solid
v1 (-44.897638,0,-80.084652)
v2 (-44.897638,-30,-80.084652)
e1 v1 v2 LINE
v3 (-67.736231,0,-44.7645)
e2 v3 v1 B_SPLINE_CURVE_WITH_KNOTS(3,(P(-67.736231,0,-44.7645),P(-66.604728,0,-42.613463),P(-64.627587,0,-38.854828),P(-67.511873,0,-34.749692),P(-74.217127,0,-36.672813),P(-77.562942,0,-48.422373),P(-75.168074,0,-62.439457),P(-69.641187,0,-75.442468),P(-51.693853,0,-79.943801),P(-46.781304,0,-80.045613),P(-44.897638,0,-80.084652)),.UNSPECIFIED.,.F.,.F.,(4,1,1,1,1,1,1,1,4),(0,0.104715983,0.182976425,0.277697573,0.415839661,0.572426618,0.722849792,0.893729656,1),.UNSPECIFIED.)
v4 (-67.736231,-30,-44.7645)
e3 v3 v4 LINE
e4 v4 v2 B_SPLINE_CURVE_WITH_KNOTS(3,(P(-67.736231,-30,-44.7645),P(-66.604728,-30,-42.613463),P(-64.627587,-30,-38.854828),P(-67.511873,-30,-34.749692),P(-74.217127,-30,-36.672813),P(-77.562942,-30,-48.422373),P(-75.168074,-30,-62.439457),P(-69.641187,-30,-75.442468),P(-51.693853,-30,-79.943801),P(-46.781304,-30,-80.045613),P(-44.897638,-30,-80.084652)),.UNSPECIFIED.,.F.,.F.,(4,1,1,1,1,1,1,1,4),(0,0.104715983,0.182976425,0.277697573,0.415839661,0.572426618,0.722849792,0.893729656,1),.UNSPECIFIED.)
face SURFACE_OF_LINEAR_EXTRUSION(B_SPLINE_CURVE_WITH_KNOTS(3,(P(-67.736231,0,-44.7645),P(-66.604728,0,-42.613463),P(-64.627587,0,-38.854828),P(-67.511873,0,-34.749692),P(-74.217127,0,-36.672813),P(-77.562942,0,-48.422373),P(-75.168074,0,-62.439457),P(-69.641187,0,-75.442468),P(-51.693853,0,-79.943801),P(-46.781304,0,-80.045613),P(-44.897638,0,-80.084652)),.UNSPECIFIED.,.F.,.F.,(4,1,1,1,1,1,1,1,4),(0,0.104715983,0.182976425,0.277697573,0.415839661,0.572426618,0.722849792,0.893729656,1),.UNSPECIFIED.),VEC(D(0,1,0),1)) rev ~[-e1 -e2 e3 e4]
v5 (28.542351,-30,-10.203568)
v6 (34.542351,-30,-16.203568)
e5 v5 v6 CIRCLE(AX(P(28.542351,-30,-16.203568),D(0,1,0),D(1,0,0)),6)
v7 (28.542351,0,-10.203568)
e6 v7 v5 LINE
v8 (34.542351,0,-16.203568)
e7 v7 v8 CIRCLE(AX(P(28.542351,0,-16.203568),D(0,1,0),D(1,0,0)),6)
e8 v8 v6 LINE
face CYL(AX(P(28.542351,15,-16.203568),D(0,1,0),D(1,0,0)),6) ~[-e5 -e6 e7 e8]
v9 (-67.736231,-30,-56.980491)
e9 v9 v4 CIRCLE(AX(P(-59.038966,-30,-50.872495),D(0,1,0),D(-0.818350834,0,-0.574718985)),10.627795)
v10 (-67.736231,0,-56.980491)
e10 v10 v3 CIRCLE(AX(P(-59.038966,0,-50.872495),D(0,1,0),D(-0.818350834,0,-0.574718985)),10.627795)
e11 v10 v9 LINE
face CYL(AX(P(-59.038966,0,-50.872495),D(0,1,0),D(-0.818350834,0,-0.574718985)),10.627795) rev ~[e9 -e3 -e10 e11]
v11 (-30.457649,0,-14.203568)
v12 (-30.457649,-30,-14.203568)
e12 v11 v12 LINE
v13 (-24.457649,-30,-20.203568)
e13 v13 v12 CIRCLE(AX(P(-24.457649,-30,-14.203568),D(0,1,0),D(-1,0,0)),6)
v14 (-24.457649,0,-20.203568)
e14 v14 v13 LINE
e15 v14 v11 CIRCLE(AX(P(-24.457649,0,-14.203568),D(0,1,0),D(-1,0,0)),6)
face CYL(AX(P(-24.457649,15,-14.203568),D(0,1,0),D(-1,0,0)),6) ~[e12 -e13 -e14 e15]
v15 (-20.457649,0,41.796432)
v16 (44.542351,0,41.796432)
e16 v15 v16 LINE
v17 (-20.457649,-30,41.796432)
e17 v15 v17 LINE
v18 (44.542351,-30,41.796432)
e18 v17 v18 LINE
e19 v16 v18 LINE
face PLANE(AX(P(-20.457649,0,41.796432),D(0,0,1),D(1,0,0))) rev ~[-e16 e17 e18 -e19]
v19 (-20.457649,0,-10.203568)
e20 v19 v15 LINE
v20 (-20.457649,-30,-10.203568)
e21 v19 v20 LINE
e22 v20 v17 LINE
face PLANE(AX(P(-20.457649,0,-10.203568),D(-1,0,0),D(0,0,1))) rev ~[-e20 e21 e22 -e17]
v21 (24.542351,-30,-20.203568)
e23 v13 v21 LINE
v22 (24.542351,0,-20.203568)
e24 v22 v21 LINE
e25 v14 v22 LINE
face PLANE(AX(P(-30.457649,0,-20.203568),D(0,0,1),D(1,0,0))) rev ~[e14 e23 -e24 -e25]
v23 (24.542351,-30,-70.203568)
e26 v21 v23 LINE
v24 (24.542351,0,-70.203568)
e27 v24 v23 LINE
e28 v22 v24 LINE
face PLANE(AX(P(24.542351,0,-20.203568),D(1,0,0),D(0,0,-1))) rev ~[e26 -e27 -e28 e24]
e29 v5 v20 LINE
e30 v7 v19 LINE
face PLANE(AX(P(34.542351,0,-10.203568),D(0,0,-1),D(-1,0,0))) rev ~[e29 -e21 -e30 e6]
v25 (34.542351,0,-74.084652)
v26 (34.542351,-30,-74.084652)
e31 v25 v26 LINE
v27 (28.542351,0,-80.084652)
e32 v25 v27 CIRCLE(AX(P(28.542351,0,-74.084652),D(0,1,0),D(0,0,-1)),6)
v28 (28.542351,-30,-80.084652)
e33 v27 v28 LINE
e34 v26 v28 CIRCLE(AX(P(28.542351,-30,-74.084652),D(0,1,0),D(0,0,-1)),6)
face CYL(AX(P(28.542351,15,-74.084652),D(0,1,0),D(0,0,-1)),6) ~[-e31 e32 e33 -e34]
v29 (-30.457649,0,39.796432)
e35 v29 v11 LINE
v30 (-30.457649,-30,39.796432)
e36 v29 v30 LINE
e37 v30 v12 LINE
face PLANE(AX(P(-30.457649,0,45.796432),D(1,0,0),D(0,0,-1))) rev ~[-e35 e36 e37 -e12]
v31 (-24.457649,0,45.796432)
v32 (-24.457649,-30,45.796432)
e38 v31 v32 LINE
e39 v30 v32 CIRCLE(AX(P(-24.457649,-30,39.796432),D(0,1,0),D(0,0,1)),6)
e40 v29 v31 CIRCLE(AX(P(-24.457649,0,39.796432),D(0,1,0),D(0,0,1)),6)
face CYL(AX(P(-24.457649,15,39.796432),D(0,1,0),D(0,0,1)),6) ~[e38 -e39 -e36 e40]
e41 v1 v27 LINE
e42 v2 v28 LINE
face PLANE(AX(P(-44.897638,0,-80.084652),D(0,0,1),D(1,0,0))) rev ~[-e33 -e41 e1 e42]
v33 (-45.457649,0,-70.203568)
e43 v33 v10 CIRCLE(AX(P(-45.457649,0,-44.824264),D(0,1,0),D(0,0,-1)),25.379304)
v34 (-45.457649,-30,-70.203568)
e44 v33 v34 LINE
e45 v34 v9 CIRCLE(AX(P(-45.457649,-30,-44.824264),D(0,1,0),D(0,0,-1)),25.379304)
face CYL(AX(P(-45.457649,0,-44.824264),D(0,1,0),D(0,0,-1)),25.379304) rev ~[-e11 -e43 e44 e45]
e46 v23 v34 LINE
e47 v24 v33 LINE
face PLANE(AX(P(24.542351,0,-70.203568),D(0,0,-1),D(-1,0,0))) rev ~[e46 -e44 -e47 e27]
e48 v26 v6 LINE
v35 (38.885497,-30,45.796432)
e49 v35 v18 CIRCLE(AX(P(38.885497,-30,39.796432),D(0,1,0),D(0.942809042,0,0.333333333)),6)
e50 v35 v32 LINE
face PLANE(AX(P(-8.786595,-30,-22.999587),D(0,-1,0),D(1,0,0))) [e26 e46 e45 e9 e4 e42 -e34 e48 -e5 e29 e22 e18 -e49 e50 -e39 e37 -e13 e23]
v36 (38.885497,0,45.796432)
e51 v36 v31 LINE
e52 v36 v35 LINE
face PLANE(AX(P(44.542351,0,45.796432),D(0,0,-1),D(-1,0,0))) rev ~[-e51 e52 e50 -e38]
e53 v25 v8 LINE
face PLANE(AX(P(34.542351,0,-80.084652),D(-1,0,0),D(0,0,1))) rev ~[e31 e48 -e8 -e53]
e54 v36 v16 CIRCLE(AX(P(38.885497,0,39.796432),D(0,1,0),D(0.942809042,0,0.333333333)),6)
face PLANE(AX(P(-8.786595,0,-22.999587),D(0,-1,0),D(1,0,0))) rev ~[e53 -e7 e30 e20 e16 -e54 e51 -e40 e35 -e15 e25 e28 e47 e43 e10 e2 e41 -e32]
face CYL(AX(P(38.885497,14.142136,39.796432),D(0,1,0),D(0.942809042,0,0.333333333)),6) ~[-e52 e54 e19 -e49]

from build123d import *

# Parameters (mm, degrees)
F1_DEPTH    = 30
F2_T1_DEPTH = 60
F2_T3_DEPTH = 58.2842712475


# Not quite as in the source:
# - a fillet or chamfer that OpenCascade refuses, or shapes differently, is made with other operations: its cross-section is extruded or revolved along the edge and cut away or added


with BuildPart() as f1:
    # F0 (on Front) → F1 (new body)
    with BuildSketch(Plane.XZ):
        with BuildLine():
            Line((-20.4576485604, 41.7964319587), (44.5423514396, 41.7964319587))
            Line((44.5423514396, 41.7964319587), (44.5423514396, 45.7964319587))
            Line((44.5423514396, 45.7964319587), (-30.4576485604, 45.7964319587))
            Line((-30.4576485604, 45.7964319587), (-30.4576485604, -20.2035680413))
            Line((-30.4576485604, -20.2035680413), (24.5423514396, -20.2035680413))
            Line((24.5423514396, -20.2035680413), (24.5423514396, -70.2035680413))
            Line((24.5423514396, -70.2035680413), (-45.4576485604, -70.2035680413))
            ThreePointArc((-45.4576485604, -70.2035680413), (-58.4112677552, -66.6488561684), (-67.7362307906, -56.9804906845))
            ThreePointArc((-67.7362307906, -56.9804906845), (-69.6667608001, -50.8724953979), (-67.7362307906, -44.7645001113))
            add(Edge.make_bspline(
                [(-67.7362307906, -44.7645001113), (-66.6047282738, -42.6134626855), (-64.6275870644, -38.8548278844), (-67.5118728603, -34.7496923274), (-74.2171267591, -36.6728128022), (-77.5629423301, -48.422372807), (-75.1680740571, -62.4394566894), (-69.641186524, -75.442468141), (-51.6938526184, -79.943801044), (-46.7813036843, -80.045612986), (-44.8976382613, -80.0846517086)],
                knots=[0, 0, 0, 0, 0.1047159829, 0.1829764247, 0.2776975731, 0.4158396611, 0.5724266185, 0.7228497918, 0.8937296562, 1, 1, 1, 1], degree=3))
            Line((-44.8976382613, -80.0846517086), (34.5423514396, -80.0846517086))
            Line((34.5423514396, -80.0846517086), (34.5423514396, -10.2035680413))
            Line((34.5423514396, -10.2035680413), (-20.4576485604, -10.2035680413))
            Line((-20.4576485604, -10.2035680413), (-20.4576485604, 41.7964319587))
        make_face()
    extrude(amount=F1_DEPTH)

    # F2: fillet of radius 6 on 5 edges, made by hand

    # F2_s2 → F2_t1 (cut)
    with BuildSketch(Plane.XZ.offset(-15)):
        with BuildLine():
            ThreePointArc((-24.4576485604, 45.7964319587), (-28.7002892475, 44.0390726458), (-30.4576485604, 39.7964319587))
            Line((-30.4576485604, 39.7964319587), (-30.4576485604, 45.7964319587))
            Line((-30.4576485604, 45.7964319587), (-24.4576485604, 45.7964319587))
        make_face()
        with BuildLine():
            ThreePointArc((-30.4576485604, -14.2035680413), (-28.7002892475, -18.4462087284), (-24.4576485604, -20.2035680413))
            Line((-24.4576485604, -20.2035680413), (-30.4576485604, -20.2035680413))
            Line((-30.4576485604, -20.2035680413), (-30.4576485604, -14.2035680413))
        make_face()
        with BuildLine():
            ThreePointArc((34.5423514396, -16.2035680413), (32.7849921267, -11.9609273542), (28.5423514396, -10.2035680413))
            Line((28.5423514396, -10.2035680413), (34.5423514396, -10.2035680413))
            Line((34.5423514396, -10.2035680413), (34.5423514396, -16.2035680413))
        make_face()
        with BuildLine():
            ThreePointArc((28.5423514396, -80.0846517086), (32.7849921267, -78.3272923957), (34.5423514396, -74.0846517086))
            Line((34.5423514396, -74.0846517086), (34.5423514396, -80.0846517086))
            Line((34.5423514396, -80.0846517086), (28.5423514396, -80.0846517086))
        make_face()
    extrude(amount=F2_T1_DEPTH, mode=Mode.SUBTRACT)

    # F2_s4 → F2_t3 (cut)
    with BuildSketch(Plane.XZ.offset(-14.1421356237)):
        with BuildLine():
            ThreePointArc((44.5423514396, 41.7964319587), (42.3495988052, 44.6954114442), (38.8854971901, 45.7964319587))
            Line((38.8854971901, 45.7964319587), (44.5423514396, 45.7964319587))
            Line((44.5423514396, 45.7964319587), (44.5423514396, 41.7964319587))
        make_face()
    extrude(amount=F2_T3_DEPTH, mode=Mode.SUBTRACT)


solid = f1.part
